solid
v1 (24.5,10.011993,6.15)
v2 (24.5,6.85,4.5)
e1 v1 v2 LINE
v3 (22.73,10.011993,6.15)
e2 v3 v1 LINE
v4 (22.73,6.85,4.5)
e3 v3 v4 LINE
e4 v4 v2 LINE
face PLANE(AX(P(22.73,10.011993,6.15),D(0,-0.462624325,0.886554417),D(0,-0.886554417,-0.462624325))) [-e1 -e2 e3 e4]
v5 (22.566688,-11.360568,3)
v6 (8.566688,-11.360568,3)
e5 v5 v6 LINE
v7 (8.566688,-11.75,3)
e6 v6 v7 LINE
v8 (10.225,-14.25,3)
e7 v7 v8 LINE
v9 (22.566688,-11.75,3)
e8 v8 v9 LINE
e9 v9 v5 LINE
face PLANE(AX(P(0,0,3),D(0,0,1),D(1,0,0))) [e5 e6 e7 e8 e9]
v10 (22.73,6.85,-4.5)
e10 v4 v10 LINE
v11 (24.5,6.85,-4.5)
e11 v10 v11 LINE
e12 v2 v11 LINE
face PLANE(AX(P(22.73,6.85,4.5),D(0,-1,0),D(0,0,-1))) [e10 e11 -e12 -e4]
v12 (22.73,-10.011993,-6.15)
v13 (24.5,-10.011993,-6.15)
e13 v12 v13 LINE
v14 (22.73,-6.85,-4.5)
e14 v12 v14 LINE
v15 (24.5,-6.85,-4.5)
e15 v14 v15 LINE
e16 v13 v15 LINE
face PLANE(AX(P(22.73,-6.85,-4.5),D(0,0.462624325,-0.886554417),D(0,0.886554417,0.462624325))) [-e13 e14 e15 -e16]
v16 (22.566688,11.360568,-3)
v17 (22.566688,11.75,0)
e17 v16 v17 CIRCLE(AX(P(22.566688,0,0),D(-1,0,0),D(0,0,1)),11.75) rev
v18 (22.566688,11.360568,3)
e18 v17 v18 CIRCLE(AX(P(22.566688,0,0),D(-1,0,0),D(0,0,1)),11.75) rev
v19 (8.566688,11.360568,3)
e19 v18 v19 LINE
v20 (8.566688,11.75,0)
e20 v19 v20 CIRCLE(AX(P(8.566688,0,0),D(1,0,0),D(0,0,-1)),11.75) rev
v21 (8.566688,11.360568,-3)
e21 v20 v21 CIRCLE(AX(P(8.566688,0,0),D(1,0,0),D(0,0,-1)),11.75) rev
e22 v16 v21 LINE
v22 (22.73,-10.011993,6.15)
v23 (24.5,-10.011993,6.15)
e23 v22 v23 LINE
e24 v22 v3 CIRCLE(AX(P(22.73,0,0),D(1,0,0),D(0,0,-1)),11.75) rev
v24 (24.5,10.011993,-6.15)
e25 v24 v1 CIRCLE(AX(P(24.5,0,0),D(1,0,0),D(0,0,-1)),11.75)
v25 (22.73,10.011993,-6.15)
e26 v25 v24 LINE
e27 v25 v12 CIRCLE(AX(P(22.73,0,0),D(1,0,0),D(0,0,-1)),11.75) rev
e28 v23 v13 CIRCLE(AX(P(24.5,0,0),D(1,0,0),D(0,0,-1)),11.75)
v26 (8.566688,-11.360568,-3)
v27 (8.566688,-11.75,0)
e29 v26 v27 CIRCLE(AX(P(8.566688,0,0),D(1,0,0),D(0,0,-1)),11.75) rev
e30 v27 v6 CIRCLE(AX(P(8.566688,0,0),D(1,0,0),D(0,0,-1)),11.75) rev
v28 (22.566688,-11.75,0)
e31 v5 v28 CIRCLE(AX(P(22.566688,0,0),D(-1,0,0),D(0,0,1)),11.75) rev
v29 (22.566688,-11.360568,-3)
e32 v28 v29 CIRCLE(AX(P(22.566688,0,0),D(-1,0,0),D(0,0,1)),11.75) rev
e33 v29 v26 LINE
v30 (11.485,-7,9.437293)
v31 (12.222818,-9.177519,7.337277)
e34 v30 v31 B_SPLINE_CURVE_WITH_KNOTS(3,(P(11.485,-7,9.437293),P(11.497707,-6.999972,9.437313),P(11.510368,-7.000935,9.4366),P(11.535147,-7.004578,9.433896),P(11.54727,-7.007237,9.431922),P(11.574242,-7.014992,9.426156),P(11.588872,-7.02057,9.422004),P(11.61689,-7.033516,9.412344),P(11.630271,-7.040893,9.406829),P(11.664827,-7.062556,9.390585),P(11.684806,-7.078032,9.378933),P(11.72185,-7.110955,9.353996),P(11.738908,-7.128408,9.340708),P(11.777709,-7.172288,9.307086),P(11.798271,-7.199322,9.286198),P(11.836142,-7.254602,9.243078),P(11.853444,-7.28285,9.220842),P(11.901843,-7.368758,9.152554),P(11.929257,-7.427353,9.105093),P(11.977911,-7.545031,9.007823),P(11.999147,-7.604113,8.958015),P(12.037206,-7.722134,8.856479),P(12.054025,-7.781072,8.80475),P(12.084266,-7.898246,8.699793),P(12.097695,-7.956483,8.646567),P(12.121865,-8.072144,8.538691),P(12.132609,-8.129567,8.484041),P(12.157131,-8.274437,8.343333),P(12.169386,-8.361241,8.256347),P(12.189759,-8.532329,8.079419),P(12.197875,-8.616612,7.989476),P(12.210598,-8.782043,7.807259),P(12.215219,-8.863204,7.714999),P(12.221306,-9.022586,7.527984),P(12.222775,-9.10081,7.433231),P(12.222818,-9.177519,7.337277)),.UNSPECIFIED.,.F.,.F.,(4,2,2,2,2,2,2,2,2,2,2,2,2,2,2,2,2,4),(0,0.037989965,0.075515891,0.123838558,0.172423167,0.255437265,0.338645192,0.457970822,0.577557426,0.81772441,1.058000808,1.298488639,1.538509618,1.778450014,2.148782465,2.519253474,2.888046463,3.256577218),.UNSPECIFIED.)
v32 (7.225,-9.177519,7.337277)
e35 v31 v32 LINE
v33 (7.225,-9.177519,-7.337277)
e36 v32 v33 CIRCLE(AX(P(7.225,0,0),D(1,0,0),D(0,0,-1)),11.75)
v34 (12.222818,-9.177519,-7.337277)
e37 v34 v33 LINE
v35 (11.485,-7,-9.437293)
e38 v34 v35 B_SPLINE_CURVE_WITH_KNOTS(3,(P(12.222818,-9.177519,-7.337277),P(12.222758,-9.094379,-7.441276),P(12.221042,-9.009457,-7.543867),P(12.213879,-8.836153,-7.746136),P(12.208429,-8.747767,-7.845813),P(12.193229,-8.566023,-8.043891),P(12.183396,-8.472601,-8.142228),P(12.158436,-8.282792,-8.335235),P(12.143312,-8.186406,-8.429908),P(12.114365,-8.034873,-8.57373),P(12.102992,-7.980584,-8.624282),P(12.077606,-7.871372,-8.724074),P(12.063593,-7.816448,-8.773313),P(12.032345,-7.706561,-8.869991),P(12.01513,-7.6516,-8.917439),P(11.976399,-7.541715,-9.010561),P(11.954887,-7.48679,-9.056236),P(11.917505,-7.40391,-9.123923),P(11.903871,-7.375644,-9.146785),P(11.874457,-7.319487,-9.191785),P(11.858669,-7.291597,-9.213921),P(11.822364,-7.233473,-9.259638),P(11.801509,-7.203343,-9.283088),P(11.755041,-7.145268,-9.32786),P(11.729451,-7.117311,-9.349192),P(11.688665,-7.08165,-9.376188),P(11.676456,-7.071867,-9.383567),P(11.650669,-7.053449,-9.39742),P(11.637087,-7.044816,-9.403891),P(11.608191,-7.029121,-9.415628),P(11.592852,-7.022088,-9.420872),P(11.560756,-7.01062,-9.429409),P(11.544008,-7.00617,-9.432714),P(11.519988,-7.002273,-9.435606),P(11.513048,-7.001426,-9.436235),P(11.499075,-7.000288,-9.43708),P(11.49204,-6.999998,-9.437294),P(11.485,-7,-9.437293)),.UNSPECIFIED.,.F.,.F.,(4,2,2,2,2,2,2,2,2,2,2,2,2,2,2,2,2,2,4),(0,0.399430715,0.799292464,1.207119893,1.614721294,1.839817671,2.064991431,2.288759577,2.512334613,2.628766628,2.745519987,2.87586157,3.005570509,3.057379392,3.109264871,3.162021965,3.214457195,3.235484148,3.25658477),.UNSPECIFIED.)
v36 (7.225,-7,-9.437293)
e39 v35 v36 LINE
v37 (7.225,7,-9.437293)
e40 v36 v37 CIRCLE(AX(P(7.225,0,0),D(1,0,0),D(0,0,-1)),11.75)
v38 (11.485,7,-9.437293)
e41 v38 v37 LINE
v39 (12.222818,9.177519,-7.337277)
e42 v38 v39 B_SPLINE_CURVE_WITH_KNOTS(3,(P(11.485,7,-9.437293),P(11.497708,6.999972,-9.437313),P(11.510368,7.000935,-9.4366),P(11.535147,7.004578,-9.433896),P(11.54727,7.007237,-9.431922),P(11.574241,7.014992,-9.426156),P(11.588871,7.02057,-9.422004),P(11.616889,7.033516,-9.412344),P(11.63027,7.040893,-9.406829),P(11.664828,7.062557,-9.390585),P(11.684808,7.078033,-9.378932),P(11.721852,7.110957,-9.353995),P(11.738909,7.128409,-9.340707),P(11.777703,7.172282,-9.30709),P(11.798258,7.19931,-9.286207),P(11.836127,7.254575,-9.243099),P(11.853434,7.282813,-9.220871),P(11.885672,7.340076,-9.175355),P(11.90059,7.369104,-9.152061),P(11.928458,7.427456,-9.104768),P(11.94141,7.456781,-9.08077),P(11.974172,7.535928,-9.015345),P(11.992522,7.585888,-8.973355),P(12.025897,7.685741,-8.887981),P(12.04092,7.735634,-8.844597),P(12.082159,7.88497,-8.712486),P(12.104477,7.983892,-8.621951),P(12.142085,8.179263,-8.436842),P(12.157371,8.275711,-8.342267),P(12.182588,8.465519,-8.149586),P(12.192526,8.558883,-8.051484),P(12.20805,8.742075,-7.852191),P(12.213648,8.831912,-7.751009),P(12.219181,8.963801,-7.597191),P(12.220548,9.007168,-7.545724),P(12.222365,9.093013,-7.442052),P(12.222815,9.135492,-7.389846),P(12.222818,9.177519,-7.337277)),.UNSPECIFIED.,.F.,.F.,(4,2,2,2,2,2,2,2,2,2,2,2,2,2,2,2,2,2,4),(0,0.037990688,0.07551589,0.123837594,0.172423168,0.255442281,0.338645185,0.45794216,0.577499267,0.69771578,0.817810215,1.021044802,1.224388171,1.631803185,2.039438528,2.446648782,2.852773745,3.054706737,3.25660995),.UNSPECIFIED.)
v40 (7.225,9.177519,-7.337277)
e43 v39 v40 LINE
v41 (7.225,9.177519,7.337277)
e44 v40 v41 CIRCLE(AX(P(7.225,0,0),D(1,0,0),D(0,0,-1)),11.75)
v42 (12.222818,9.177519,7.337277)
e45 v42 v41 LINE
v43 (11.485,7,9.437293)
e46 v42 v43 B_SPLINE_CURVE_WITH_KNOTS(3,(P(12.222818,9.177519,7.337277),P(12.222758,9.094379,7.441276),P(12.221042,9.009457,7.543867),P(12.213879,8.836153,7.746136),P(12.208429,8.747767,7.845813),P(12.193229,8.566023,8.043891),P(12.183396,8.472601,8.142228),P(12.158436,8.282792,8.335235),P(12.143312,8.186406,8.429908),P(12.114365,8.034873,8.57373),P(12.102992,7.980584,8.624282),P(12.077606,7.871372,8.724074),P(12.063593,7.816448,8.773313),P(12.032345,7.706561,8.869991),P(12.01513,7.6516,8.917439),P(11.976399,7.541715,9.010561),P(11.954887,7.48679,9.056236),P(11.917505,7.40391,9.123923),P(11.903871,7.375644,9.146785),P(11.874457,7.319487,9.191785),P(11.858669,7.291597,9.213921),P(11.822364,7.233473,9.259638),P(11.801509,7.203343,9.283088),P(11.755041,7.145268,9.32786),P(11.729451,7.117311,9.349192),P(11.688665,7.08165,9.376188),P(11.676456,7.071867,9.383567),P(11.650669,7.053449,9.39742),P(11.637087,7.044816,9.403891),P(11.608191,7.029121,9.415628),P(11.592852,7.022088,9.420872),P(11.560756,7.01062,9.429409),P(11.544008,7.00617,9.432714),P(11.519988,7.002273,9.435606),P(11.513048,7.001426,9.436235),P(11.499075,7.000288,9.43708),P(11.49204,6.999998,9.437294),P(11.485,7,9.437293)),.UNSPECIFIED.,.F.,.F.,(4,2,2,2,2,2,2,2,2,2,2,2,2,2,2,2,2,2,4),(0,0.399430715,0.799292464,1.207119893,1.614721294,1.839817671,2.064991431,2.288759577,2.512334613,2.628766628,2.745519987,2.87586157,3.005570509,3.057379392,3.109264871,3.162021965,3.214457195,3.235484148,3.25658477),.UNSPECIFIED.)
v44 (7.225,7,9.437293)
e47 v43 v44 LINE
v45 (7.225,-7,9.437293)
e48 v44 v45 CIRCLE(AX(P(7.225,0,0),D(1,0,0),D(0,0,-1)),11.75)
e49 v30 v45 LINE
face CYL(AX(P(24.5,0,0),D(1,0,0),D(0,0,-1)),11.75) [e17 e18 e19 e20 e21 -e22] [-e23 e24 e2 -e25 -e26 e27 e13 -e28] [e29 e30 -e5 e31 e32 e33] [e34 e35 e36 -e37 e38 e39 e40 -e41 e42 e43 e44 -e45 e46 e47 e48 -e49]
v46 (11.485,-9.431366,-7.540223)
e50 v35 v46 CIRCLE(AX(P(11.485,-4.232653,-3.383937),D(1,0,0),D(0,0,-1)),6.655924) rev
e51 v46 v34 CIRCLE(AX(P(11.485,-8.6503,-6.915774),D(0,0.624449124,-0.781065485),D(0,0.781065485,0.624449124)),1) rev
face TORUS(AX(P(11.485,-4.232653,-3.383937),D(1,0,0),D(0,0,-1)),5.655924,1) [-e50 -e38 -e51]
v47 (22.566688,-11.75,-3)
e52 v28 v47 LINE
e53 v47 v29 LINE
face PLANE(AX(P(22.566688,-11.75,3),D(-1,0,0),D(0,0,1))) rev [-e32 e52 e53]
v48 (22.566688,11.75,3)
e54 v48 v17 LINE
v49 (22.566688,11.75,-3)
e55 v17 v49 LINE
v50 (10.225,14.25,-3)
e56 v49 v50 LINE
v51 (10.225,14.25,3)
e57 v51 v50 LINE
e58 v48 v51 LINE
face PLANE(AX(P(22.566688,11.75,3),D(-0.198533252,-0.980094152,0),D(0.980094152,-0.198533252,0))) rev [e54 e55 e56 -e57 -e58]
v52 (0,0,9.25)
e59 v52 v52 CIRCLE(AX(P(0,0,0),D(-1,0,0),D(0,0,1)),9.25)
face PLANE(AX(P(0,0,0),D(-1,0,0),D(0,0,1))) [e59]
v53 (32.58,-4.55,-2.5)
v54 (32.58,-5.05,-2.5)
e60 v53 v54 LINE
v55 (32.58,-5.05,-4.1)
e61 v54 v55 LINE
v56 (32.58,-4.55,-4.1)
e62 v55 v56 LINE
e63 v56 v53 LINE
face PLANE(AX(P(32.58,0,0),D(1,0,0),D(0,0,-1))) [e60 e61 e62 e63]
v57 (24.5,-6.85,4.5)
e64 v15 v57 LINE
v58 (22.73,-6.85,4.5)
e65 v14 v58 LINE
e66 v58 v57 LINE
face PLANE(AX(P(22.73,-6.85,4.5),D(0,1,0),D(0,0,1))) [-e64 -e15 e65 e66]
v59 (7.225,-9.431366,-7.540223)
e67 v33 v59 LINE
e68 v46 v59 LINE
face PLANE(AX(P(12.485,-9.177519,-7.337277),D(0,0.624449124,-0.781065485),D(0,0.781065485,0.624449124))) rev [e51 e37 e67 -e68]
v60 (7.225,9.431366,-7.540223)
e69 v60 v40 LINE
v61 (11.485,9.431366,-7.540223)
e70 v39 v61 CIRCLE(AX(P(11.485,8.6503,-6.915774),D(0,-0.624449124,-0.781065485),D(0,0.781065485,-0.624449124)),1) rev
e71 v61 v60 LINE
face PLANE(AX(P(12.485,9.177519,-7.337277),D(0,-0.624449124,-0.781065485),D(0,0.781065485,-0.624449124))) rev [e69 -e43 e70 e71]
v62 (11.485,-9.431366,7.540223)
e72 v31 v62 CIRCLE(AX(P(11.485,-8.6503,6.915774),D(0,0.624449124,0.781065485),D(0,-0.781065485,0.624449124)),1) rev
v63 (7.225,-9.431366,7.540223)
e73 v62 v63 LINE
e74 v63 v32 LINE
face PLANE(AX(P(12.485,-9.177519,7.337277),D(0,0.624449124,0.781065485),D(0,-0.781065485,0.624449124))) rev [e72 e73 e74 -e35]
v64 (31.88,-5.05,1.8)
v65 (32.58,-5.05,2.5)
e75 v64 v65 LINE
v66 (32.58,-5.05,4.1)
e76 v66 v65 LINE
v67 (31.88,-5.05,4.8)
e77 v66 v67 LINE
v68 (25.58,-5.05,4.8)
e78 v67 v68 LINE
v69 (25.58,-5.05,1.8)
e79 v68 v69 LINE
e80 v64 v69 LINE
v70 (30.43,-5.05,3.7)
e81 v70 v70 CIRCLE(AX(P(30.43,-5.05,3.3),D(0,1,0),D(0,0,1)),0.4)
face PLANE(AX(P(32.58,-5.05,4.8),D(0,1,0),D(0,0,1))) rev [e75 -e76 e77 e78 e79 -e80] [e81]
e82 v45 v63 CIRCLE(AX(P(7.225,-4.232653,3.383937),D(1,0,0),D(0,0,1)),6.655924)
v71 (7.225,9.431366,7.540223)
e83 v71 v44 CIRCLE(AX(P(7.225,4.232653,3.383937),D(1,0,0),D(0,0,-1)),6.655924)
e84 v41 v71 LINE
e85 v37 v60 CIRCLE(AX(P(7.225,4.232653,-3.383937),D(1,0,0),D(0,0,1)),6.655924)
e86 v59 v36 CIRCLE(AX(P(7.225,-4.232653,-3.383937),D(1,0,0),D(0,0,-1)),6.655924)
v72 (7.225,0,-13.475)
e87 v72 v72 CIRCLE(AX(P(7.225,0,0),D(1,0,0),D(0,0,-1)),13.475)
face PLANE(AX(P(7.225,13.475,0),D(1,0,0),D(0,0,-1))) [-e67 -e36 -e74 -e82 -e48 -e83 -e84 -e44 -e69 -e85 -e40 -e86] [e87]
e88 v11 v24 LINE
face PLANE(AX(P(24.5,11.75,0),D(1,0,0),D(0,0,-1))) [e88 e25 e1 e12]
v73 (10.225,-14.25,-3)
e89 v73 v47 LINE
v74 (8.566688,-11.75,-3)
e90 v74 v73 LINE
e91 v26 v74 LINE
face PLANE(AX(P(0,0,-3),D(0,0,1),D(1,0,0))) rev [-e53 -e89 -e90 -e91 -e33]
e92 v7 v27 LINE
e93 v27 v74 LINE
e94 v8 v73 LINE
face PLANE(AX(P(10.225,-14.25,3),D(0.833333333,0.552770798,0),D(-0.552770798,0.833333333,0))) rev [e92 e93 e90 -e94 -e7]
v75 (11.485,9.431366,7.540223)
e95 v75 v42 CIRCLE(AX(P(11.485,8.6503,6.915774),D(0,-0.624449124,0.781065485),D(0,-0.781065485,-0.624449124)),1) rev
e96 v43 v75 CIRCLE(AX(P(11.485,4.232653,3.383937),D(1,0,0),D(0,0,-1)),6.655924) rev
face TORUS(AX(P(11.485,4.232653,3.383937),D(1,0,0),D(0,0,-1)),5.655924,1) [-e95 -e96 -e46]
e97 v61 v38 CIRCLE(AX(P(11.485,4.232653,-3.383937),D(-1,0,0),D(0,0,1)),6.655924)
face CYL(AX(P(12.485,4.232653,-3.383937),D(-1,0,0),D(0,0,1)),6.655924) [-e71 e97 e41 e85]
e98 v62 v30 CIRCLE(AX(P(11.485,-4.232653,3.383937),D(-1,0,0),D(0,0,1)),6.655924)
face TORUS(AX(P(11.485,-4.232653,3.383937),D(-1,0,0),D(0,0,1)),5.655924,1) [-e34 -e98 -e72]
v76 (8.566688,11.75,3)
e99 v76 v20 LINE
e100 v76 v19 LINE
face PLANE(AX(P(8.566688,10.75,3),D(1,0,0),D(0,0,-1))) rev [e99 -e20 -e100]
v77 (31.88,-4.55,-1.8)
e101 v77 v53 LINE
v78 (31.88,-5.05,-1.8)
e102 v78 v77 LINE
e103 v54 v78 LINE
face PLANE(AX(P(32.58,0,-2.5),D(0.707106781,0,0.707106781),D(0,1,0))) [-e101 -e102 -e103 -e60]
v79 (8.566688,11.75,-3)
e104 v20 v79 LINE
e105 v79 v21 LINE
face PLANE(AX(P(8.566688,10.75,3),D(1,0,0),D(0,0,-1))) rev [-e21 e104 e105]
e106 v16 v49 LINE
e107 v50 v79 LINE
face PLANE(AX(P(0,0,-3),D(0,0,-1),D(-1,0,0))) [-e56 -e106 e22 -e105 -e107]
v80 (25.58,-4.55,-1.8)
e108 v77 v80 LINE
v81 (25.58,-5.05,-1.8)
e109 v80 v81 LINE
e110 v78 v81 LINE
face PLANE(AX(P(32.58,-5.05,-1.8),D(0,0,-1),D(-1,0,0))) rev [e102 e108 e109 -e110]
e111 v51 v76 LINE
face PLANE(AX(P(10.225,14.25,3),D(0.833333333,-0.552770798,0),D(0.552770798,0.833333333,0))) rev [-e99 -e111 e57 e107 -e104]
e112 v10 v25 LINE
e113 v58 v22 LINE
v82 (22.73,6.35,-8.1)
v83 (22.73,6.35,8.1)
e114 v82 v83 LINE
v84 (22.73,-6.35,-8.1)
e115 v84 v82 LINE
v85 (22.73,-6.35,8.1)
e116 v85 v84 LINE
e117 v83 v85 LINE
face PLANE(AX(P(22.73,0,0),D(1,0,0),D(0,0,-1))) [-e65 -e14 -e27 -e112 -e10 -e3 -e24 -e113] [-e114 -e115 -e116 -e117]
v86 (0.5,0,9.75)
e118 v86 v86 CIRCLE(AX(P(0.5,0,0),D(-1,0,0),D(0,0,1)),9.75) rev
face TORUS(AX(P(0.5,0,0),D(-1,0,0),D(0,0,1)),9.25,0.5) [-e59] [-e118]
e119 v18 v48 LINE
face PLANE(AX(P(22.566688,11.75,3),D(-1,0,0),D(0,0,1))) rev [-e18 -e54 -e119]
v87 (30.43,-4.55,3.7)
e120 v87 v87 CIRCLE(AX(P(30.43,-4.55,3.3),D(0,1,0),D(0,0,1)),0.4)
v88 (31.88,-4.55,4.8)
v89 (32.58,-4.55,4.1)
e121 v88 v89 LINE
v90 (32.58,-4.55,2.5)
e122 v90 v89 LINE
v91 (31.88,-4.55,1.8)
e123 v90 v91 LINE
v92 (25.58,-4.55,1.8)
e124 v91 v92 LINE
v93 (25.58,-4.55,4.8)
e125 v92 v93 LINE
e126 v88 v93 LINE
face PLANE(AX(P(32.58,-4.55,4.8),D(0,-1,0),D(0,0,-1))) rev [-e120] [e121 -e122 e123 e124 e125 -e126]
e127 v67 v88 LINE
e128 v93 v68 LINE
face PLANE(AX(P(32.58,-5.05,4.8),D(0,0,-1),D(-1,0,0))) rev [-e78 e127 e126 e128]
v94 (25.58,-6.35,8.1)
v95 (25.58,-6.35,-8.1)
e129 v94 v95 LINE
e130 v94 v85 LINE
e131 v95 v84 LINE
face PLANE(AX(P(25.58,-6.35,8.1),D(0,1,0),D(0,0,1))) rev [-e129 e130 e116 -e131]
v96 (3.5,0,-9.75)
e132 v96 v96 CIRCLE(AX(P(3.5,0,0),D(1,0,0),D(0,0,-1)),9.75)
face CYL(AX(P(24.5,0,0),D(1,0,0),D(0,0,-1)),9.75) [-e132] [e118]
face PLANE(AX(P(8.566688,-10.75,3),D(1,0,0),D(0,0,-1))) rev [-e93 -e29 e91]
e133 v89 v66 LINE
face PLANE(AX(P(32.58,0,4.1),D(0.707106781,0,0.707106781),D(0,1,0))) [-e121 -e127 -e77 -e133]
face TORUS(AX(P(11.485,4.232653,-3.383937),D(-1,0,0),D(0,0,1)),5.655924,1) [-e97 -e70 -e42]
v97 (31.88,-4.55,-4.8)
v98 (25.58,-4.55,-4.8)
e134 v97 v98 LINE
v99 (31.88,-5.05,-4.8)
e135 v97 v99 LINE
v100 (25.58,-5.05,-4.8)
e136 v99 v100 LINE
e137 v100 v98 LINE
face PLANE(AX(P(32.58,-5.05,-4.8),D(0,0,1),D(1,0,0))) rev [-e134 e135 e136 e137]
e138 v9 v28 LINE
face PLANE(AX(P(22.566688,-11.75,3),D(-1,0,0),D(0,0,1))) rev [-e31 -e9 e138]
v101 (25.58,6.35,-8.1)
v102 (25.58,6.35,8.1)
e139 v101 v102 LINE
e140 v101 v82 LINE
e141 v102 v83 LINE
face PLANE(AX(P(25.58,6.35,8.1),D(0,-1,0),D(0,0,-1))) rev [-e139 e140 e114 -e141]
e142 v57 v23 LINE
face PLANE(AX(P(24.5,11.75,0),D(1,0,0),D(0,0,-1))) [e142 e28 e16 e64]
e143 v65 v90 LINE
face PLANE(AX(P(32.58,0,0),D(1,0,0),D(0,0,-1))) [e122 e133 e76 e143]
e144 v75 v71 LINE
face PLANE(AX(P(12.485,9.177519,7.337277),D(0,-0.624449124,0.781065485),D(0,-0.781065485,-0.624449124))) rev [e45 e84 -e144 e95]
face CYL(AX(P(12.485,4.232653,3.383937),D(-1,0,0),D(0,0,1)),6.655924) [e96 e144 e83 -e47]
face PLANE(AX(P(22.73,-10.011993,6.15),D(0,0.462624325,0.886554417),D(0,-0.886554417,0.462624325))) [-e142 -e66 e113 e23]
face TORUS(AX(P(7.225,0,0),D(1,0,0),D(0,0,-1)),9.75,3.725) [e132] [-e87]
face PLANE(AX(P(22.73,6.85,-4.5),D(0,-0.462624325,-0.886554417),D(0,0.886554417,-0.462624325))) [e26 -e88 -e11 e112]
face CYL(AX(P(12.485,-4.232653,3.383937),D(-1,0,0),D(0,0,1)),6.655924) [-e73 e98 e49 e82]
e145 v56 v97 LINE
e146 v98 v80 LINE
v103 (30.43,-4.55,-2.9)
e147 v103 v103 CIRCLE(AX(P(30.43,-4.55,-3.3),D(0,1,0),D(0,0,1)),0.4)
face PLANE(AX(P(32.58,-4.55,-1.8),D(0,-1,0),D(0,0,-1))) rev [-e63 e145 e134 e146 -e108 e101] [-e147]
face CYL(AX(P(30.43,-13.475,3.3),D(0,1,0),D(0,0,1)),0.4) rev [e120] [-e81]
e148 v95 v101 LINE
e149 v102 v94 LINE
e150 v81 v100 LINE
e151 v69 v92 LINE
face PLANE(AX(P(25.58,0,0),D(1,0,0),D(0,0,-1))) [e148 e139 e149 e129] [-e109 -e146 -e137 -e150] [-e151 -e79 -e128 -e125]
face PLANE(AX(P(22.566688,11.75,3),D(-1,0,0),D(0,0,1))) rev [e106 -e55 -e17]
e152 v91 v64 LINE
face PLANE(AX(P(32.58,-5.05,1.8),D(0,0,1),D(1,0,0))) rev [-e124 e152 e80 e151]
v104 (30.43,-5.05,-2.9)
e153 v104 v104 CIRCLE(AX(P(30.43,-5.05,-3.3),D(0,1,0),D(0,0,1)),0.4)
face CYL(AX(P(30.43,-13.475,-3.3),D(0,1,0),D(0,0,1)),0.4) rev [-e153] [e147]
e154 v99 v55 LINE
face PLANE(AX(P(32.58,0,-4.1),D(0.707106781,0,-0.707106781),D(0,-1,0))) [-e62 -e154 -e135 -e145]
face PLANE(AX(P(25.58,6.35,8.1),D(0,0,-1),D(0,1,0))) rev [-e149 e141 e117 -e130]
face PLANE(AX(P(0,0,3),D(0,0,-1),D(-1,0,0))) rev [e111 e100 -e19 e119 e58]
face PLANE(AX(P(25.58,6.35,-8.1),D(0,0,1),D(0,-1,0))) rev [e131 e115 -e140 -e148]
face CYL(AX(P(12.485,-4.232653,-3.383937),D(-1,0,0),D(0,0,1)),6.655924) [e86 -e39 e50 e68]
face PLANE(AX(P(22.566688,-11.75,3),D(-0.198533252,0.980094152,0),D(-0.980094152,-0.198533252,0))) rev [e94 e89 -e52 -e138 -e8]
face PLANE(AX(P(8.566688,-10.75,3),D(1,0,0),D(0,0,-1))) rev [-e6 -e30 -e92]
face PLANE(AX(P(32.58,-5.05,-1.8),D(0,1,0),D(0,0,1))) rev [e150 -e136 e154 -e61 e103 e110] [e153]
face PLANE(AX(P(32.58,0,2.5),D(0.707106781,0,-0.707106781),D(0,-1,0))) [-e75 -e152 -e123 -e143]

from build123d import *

# Parameters (mm, degrees)
BOSS_EXTRUDE4_START = 5.26
BOSS_EXTRUDE4_DEPTH = 5.26
FILLET2_R           = 1
SKETCH8_OUTSIDE_W   = 38.012
SKETCH8_OUTSIDE_H   = 38.012
CUT_EXTRUDE2_DEPTH  = 1.77
BOSS_EXTRUDE1_DEPTH = 2.85
SKETCH3_W           = 3.0000000000000004
SKETCH3_H           = 0.5
SKETCH3_W_2         = 3.000000000000001
BOSS_EXTRUDE2_DEPTH = 7
SKETCH4_R           = 0.40000000000000124
CUT_EXTRUDE1_DEPTH  = 40.59712936066199
CHAMFER1_SIZE       = 0.7
BOSS_EXTRUDE3_DEPTH = 3
FILLET1_R           = 0.5


with BuildPart() as part:
    # Sketch1 → Revolve1 (revolve)
    with BuildSketch(Plane.XY, mode=Mode.PRIVATE) as revolve1_sk:
        with BuildLine():
            Line((0, 0), (0, 9.75))
            Line((0, 9.75), (3.4999999999999996, 9.749999999999998))
            ThreePointArc((3.4999999999999996, 9.749999999999998), (4.591027240080107, 12.383972759919889), (7.224999999999997, 13.474999999999998))
            Line((7.224999999999997, 13.474999999999998), (7.224999999999998, 11.75))
            Line((7.224999999999998, 11.75), (24.5, 11.75))
            Line((24.5, 11.75), (24.5, 0))
            Line((24.5, 0), (0, 0))
        make_face()
    revolve(revolve1_sk.sketch.rotate(Axis((24.5, 0, 0), (-1, 0, 0)), 90), axis=Axis((24.5, 0, 0), (-1, 0, 0)))

    # Sketch7 → Boss-Extrude4 (add)
    with BuildSketch(Plane(origin=(7.224999999999997, 0, 0), x_dir=(0, 0, -1), z_dir=(1, 0, 0)).offset(BOSS_EXTRUDE4_START)):
        with BuildLine():
            Line((-7.337277205884233, 9.177519447215122), (-7.540223171153369, 9.431365729797664))
            ThreePointArc((-7.540223171153369, 9.431365729797664), (-8.631515815707116, 8.327069376529131), (-9.437293044088438, 7))
            ThreePointArc((-9.437293044088438, 7), (-8.457656265394512, 8.156626171183342), (-7.337277205884233, 9.177519447215122))
        make_face()
        with BuildLine():
            Line((-7.337277205884229, -9.177519447215122), (-7.540223171153365, -9.431365729797664))
            ThreePointArc((-7.540223171153365, -9.431365729797664), (-8.631515815707113, -8.327069376529131), (-9.437293044088431, -7))
            ThreePointArc((-9.437293044088431, -7), (-8.457656265394512, -8.15662617118334), (-7.337277205884229, -9.177519447215122))
        make_face()
        with BuildLine():
            Line((7.337277205884229, -9.177519447215122), (7.540223171153365, -9.431365729797664))
            ThreePointArc((7.540223171153365, -9.431365729797664), (8.631515815707113, -8.327069376529131), (9.437293044088431, -7))
            ThreePointArc((9.437293044088431, -7), (8.45765626539451, -8.156626171183342), (7.337277205884229, -9.177519447215122))
        make_face()
        with BuildLine():
            Line((7.337277205884233, 9.177519447215122), (7.540223171153369, 9.431365729797664))
            ThreePointArc((7.540223171153369, 9.431365729797664), (8.631515815707118, 8.32706937652913), (9.437293044088438, 7))
            ThreePointArc((9.437293044088438, 7), (8.457656265394514, 8.15662617118334), (7.337277205884233, 9.177519447215122))
        make_face()
    extrude(amount=-BOSS_EXTRUDE4_DEPTH)

    # Fillet2
    # the kernel refuses this fillet: 1 mm, written as the material it takes off along each edge
    with BuildSketch(Plane(origin=(12.484999999999996, -4.232653152686616, 3.383937203973504), x_dir=(0, -0.9556882368173963, 0.2943806957136558), z_dir=(0, -0.2943806957136558, -0.9556882368173963))) as fillet2_piece_1_section:
        with BuildLine():
            CenterArc((6.655924090642022 - FILLET2_R, FILLET2_R), FILLET2_R, 270, 90)
            Line((6.655924090642022 - FILLET2_R, 0), (6.655924090642022, 0))
            Line((6.655924090642022, 0), (6.6559240906420225, FILLET2_R))
        make_face()
    fillet2_piece_1 = revolve(axis=Axis((12.484999999999996, -4.232653152686616, 3.383937203973504), (-1, 0, 0)), revolution_arc=69.83301403972071, mode=Mode.PRIVATE)
    fillet2_piece_1 = fillet2_piece_1 - Plane(origin=(12.185339920044097, 0, 0), x_dir=(0, 1.1e-16, -1), z_dir=(1, 0, 0)) * Cylinder(11.75, 27, mode=Mode.PRIVATE)
    add(fillet2_piece_1, mode=Mode.SUBTRACT)
    with BuildSketch(Plane(origin=(12.484999999999996, -4.232653152686616, -3.383937203973504), x_dir=(0, -0.9556882368173963, -0.2943806957136558), z_dir=(0, -0.2943806957136558, 0.9556882368173963))) as fillet2_piece_2_section:
        with BuildLine():
            CenterArc((6.655924090642022 - FILLET2_R, -FILLET2_R), FILLET2_R, 0, 90)
            Line((6.655924090642022 - FILLET2_R, 0), (6.655924090642022, 0))
            Line((6.655924090642022, 0), (6.6559240906420225, -FILLET2_R))
        make_face()
    fillet2_piece_2 = revolve(axis=Axis((12.484999999999996, -4.232653152686616, -3.383937203973504), (1, 0, 0)), revolution_arc=69.83301403972071, mode=Mode.PRIVATE)
    fillet2_piece_2 = fillet2_piece_2 - Plane(origin=(12.185339900483468, 0, 0), x_dir=(0, 1.1e-16, -1), z_dir=(1, 0, 0)) * Cylinder(11.75, 27, mode=Mode.PRIVATE)
    add(fillet2_piece_2, mode=Mode.SUBTRACT)
    with BuildSketch(Plane(origin=(12.484999999999996, 4.2326531526865825, -3.383937203973474), x_dir=(0, 0.9556882368173955, -0.29438069571365894), z_dir=(0, 0.29438069571365894, 0.9556882368173955))) as fillet2_piece_3_section:
        with BuildLine():
            CenterArc((6.65592409064207 - FILLET2_R, FILLET2_R), FILLET2_R, 270, 90)
            Line((6.65592409064207 - FILLET2_R, 0), (6.65592409064207, 0))
            Line((6.65592409064207, 0), (6.65592409064207, FILLET2_R))
        make_face()
    fillet2_piece_3 = revolve(axis=Axis((12.484999999999996, 4.2326531526865825, -3.383937203973474), (-1, 0, 0)), revolution_arc=69.83301403972023, mode=Mode.PRIVATE)
    fillet2_piece_3 = fillet2_piece_3 - Plane(origin=(12.185339920045562, 0, 0), x_dir=(0, 1.1e-16, -1), z_dir=(1, 0, 0)) * Cylinder(11.75, 27, mode=Mode.PRIVATE)
    add(fillet2_piece_3, mode=Mode.SUBTRACT)
    with BuildSketch(Plane(origin=(12.484999999999996, 4.232653152686593, 3.3839372039734887), x_dir=(0, 0.955688236817396, 0.29438069571365705), z_dir=(0, 0.29438069571365705, -0.955688236817396))) as fillet2_piece_4_section:
        with BuildLine():
            CenterArc((6.65592409064205 - FILLET2_R, -FILLET2_R), FILLET2_R, 0, 89.99999999999994)
            Line((6.65592409064205 - FILLET2_R, 0), (6.65592409064205, 0))
            Line((6.65592409064205, 0), (6.655924090642049, -FILLET2_R))
        make_face()
    fillet2_piece_4 = revolve(axis=Axis((12.484999999999996, 4.232653152686593, 3.3839372039734887), (1, 0, 0)), revolution_arc=69.83301403972044, mode=Mode.PRIVATE)
    fillet2_piece_4 = fillet2_piece_4 - Plane(origin=(12.185339900321193, 0, 0), x_dir=(0, 1.1e-16, -1), z_dir=(1, 0, 0)) * Cylinder(11.75, 27, mode=Mode.PRIVATE)
    add(fillet2_piece_4, mode=Mode.SUBTRACT)

    # Sketch8 outside → Cut-Extrude2 (cut)
    with BuildSketch(Plane(origin=(24.5, 0, 0), x_dir=(0, 0, -1), z_dir=(1, 0, 0))):
        Rectangle(SKETCH8_OUTSIDE_W, SKETCH8_OUTSIDE_H)
        with BuildLine():
            Line((-6.1499999999999995, 10.011992808627065), (-4.5, 6.85))
            Line((-4.5, 6.85), (4.5, 6.85))
            Line((4.5, 6.85), (6.1499999999999995, 10.011992808627065))
            ThreePointArc((6.1499999999999995, 10.011992808627065), (7.2e-16, 11.750000000000002), (-6.1499999999999995, 10.011992808627065))
        make_face(mode=Mode.SUBTRACT)
        with BuildLine():
            Line((4.5, -6.85), (6.1499999999999995, -10.011992808627065))
            ThreePointArc((6.1499999999999995, -10.011992808627065), (7.2e-16, -11.750000000000002), (-6.1499999999999995, -10.011992808627065))
            Line((-6.1499999999999995, -10.011992808627065), (-4.5, -6.85))
            Line((-4.5, -6.85), (4.5, -6.85))
        make_face(mode=Mode.SUBTRACT)
    extrude(amount=-CUT_EXTRUDE2_DEPTH, mode=Mode.SUBTRACT)

    # Sketch2 → Boss-Extrude1 (add)
    with BuildSketch(Plane(origin=(22.73, 0, 0), x_dir=(0, 0, -1), z_dir=(1, 0, 0))):
        Polygon((-8.100000000000001, 6.35), (8.099999999999998, 6.35), (8.1, -6.35), (-8.1, -6.35), align=None)
    extrude(amount=BOSS_EXTRUDE1_DEPTH)

    # Sketch3 → Boss-Extrude2 (add)
    with BuildSketch(Plane(origin=(25.58, 0, 0), x_dir=(0, 0, -1), z_dir=(1, 0, 0))):
        with Locations((-3.3, -4.8)):
            Rectangle(SKETCH3_W, SKETCH3_H)
        with Locations((3.300000000000001, -4.799999999999999)):
            Rectangle(SKETCH3_W_2, SKETCH3_H)
    extrude(amount=BOSS_EXTRUDE2_DEPTH)

    # Sketch4 → Cut-Extrude1 (cut, through all)
    with BuildSketch(Plane(origin=(0, -4.55, 0), x_dir=(-1, 0, 0), z_dir=(0, 1, -6e-17))):
        with Locations(Location((-30.43, 3.2999999999999994, 0), (0, 0, 90))):
            Circle(SKETCH4_R)
        with Locations(Location((-30.43, -3.3000000000000007, 0), (0, 0, 90))):
            Circle(SKETCH4_R)
    extrude(amount=-CUT_EXTRUDE1_DEPTH, mode=Mode.SUBTRACT)

    # Chamfer1
    chamfer1_edges = [part.edges().sort_by_distance(p)[0] for p in [
        (32.58, -4.8, 1.7999999999999996),
        (32.58, -4.8, 4.8),
        (32.58, -4.799999999999999, -4.800000000000002),
        (32.58, -4.799999999999999, -1.8000000000000007),
    ]]
    chamfer(chamfer1_edges, length=CHAMFER1_SIZE)

    # Sketch5 → Boss-Extrude3 (add, symmetric)
    with BuildSketch(Plane.XY):
        Polygon((22.56668760482229, -11.75), (10.224999999999994, -14.25), (8.566687604822294, -11.750000000000002), (8.566687604822294, -10.750000000000002), (22.56668760482229, -10.75), align=None)
        Polygon((8.56668760482229, 10.750000000000005), (8.56668760482229, 11.750000000000005), (10.22499999999999, 14.250000000000004), (22.566687604822288, 11.750000000000007), (22.566687604822288, 10.750000000000007), align=None)
    extrude(amount=BOSS_EXTRUDE3_DEPTH, both=True)

    # Fillet1
    fillet1_edges = [part.edges().sort_by_distance(p)[0] for p in [
        (0, -2.28e-15, 9.75),
    ]]
    fillet(fillet1_edges, radius=FILLET1_R)


solid = part.part
